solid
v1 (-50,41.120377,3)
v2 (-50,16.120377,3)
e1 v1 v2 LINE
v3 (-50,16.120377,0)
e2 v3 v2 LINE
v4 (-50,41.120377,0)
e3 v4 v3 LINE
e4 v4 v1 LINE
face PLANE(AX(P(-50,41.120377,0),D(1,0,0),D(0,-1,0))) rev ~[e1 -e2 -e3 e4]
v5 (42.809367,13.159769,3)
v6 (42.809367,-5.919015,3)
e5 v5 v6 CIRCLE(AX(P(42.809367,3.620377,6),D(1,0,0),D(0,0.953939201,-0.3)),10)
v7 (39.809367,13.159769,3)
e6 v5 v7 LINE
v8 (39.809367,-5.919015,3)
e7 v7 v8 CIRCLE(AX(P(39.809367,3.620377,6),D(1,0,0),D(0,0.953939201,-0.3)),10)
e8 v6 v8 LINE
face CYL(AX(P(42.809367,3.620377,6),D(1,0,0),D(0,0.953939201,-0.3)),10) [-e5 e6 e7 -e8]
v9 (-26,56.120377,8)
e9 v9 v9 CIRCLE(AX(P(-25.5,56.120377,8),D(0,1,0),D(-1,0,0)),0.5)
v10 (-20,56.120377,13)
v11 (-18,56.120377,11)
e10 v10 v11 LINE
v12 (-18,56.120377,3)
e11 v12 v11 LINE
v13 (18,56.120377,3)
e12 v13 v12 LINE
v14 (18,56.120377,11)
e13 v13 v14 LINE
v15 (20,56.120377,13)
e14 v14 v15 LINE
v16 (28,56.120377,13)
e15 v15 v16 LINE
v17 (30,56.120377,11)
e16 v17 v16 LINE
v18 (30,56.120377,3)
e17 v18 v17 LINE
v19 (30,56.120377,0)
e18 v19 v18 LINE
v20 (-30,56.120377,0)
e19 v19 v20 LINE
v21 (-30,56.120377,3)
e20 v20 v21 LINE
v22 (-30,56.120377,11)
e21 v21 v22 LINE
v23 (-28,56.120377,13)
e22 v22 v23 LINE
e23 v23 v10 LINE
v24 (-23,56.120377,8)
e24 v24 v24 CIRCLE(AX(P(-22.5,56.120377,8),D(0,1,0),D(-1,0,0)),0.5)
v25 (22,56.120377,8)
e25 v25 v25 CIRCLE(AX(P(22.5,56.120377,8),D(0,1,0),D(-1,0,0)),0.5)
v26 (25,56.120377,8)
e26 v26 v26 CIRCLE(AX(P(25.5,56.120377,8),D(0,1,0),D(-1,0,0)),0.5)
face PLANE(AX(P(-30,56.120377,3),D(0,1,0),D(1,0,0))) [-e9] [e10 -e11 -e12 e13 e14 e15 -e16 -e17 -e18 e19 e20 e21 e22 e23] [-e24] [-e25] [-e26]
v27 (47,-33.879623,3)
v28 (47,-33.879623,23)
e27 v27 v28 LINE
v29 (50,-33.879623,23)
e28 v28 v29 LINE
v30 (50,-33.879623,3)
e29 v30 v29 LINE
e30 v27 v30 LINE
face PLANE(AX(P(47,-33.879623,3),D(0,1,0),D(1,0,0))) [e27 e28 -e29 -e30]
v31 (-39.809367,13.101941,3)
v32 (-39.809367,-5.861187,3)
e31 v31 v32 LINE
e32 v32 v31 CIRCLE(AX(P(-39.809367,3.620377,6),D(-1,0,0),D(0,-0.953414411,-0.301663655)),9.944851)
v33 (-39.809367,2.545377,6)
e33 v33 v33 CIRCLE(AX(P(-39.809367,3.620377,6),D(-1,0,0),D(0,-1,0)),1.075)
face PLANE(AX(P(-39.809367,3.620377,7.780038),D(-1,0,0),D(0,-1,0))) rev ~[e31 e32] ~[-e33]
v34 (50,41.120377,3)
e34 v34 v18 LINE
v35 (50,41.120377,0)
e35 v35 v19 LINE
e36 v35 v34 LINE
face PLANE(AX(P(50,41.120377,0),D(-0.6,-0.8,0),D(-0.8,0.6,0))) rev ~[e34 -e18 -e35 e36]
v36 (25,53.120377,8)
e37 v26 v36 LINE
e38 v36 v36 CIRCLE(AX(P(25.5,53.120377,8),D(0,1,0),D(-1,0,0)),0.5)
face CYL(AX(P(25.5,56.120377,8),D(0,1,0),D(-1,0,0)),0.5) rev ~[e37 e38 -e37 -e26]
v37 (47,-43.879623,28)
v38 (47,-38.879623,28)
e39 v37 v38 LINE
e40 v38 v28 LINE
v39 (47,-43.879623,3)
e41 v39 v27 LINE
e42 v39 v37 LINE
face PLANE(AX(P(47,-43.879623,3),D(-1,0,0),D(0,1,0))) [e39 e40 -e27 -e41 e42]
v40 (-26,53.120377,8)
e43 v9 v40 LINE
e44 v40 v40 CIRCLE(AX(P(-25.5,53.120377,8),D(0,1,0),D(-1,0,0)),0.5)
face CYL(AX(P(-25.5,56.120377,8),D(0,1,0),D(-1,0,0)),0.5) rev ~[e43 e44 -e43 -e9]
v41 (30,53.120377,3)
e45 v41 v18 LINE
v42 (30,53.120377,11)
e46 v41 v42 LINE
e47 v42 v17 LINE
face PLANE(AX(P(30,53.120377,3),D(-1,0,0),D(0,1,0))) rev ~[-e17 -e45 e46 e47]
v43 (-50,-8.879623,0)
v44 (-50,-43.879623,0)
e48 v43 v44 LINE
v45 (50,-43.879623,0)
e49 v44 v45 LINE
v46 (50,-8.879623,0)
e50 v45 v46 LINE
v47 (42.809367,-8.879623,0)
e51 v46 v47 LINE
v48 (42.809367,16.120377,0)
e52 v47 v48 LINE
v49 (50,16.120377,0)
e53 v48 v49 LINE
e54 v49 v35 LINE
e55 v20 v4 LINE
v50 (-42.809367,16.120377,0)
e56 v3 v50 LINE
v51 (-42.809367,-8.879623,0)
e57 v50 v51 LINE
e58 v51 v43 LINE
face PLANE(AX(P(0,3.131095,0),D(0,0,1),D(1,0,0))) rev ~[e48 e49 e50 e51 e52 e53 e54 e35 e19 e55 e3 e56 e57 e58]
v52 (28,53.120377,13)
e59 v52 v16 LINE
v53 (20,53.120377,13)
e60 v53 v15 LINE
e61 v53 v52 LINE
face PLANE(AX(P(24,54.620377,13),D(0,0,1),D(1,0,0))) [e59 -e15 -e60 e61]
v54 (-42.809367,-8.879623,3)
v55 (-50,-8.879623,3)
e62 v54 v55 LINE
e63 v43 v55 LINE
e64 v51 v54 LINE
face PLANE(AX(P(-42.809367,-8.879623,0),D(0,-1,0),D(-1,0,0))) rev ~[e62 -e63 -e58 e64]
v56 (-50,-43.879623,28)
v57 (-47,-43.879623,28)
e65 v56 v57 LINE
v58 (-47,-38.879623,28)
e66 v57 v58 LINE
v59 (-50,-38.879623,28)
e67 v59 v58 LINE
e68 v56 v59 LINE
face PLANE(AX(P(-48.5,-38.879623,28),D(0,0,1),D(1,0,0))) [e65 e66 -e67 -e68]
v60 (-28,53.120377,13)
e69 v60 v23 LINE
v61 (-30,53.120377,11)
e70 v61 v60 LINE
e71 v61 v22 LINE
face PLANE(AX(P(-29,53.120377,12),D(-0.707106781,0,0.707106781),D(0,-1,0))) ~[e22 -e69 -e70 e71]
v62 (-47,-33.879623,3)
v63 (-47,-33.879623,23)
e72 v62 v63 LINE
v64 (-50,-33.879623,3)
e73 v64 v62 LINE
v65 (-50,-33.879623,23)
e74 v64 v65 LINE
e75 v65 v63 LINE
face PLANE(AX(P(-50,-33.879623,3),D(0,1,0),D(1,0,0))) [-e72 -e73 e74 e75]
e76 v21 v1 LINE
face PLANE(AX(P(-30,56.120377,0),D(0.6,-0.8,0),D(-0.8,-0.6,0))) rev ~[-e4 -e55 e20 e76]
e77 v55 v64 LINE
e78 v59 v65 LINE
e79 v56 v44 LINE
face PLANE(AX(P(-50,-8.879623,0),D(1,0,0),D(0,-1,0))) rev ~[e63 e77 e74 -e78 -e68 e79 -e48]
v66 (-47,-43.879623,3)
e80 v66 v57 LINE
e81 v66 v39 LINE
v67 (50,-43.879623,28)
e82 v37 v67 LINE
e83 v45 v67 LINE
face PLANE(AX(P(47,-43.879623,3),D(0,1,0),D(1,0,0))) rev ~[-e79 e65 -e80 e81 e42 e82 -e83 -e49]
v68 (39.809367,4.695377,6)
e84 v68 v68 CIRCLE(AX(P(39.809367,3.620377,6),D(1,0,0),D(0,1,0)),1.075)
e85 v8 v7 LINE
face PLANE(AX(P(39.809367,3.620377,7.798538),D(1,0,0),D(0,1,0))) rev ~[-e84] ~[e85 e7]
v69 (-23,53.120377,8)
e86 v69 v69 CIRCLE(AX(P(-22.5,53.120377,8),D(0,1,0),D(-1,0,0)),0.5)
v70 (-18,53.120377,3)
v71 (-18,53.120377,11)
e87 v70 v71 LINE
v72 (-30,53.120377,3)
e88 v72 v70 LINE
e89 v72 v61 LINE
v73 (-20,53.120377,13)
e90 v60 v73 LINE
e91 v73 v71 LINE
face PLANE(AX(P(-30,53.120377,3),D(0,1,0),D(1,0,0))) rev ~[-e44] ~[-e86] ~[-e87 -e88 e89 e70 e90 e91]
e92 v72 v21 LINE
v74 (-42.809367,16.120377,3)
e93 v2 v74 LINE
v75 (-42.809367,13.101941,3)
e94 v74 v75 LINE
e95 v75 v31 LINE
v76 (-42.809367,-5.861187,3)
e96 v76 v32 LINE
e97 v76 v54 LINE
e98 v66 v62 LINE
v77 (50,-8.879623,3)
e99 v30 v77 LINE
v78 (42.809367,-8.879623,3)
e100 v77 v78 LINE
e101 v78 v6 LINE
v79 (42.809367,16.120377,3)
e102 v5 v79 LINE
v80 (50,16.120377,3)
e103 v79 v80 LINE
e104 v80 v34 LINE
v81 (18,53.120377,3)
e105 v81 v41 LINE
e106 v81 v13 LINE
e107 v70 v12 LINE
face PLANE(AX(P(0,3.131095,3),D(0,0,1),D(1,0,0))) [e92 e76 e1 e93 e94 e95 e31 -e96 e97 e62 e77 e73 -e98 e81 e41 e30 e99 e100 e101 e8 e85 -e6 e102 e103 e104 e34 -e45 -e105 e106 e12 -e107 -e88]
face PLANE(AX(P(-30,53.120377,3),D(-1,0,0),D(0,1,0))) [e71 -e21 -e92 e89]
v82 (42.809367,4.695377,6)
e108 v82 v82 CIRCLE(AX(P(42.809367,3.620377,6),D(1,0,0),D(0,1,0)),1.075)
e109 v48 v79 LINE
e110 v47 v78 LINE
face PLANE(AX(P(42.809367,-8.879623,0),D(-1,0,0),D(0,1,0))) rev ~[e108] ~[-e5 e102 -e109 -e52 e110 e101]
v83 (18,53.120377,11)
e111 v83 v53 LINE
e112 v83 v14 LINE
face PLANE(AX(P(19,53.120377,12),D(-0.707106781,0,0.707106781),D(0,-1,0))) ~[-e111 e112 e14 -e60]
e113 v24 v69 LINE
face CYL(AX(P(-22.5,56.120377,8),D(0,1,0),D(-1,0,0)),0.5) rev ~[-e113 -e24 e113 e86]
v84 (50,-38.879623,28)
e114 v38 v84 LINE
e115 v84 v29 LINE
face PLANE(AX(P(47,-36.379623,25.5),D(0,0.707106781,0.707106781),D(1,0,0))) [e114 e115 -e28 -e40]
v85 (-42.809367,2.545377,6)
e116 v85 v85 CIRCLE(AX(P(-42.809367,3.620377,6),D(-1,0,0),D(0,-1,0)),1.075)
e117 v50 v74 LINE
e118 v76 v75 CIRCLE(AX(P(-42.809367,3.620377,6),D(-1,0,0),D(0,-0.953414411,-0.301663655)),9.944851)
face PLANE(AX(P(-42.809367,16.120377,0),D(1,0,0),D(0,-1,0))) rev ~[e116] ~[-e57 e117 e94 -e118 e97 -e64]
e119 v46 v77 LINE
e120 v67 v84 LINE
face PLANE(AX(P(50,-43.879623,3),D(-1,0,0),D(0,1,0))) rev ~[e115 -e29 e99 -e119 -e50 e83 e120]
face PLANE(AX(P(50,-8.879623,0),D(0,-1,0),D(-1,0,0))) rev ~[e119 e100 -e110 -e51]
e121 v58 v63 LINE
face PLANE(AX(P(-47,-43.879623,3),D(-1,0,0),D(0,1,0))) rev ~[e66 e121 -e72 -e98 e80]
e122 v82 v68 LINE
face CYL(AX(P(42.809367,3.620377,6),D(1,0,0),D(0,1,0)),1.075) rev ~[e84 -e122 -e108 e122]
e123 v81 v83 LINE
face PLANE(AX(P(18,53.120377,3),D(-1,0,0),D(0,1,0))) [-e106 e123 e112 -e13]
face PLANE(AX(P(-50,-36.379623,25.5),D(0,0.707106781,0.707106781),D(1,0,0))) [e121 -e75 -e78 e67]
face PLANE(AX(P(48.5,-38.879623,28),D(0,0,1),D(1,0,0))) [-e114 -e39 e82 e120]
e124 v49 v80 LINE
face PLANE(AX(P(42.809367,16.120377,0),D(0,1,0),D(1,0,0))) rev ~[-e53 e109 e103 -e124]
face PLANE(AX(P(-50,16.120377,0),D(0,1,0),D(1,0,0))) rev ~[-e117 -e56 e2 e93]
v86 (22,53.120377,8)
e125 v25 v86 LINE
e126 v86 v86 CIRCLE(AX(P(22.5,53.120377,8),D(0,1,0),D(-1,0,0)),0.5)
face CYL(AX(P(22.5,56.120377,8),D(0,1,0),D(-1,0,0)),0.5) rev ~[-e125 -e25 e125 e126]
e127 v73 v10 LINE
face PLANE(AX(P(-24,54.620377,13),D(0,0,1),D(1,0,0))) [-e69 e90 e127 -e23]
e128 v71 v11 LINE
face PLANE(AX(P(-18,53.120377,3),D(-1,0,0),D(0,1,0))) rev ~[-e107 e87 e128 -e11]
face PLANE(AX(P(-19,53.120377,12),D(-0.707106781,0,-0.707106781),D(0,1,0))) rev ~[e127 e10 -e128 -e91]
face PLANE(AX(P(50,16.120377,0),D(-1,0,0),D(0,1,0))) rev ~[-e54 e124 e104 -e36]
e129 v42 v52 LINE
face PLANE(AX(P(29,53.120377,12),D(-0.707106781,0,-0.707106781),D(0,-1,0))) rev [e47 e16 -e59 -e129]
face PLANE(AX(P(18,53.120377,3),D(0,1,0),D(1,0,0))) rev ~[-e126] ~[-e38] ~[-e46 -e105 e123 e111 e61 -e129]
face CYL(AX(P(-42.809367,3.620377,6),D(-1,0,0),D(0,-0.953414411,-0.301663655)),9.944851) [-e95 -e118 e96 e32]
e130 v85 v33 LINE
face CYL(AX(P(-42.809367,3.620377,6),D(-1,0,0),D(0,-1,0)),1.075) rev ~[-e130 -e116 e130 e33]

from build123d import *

# Parameters (mm, degrees)
F1_DEPTH  = 3
F2_R      = 1.075
F3_DEPTH  = 3
F4_R      = 1.075
F5_DEPTH  = 3
F6_W      = 12
F6_H      = 3
F7_DEPTH  = 10
F8_R      = 0.5
F9_DEPTH  = 3
F10_SIZE  = 2
F11_W     = 3
F11_H     = 10
F12_DEPTH = 25
F13_SIZE  = 5


# Not quite as in the source:
# - a feature names something its author has since deleted; it is built from what else it names


with BuildPart() as f1:
    # F0 (on Top) → F1 (new body)
    with BuildSketch(Plane.XY):
        Polygon((30, 56.1203770339), (-30, 56.1203770339), (-50, 41.1203770339), (-50, 16.1203770339), (-42.8093671799, 16.1203770339), (-42.8093671799, -8.8796229661), (-50, -8.8796229661), (-50, -43.8796229661), (50, -43.8796229661), (50, -8.8796229661), (42.8093671799, -8.8796229661), (42.8093671799, 16.1203770339), (50, 16.1203770339), (50, 41.1203770339), align=None)
    extrude(amount=F1_DEPTH)

    # F2 (on face) → F3 (join)
    with BuildSketch(Plane.YZ.offset(42.8093671799)):
        with BuildLine():
            Line((-5.9190149802, 3), (13.1597690481, 3))
            ThreePointArc((13.1597690481, 3), (3.6203770339, 16), (-5.9190149802, 3))
        make_face()
        with Locations((3.6203770339, 6)):
            Circle(F2_R, mode=Mode.SUBTRACT)
    extrude(amount=-F3_DEPTH)

    # F4 (on face) → F5 (join)
    with BuildSketch(Plane(origin=(-42.8093671799, 0, 0), x_dir=(0, -1, 0), z_dir=(-1, 0, 0))):
        with BuildLine():
            Line((-13.1019409746, 3), (5.8611869067, 3))
            ThreePointArc((5.8611869067, 3), (-3.6203770339, 15.9448506656), (-13.1019409746, 3))
        make_face()
        with Locations((-3.6203770339, 6)):
            Circle(F4_R, mode=Mode.SUBTRACT)
    extrude(amount=-F5_DEPTH)

    # F6 (on face) → F7 (join)
    with BuildSketch(Plane.XY.offset(3)):
        with Locations((-24, 54.6203770339)):
            Rectangle(F6_W, F6_H)
        with Locations((24, 54.6203770339)):
            Rectangle(F6_W, F6_H)
    extrude(amount=F7_DEPTH)

    # F8 (on face) → F9 (cut, through all)
    with BuildSketch(Plane(origin=(0, 56.1203770339, 0), x_dir=(-1, 0, 0), z_dir=(0, 1, 0))):
        with Locations((-25.5, 8)):
            Circle(F8_R)
        with Locations((-22.5, 8)):
            Circle(F8_R)
        with Locations((25.5, 8)):
            Circle(F8_R)
        with Locations((22.5, 8)):
            Circle(F8_R)
    extrude(amount=-F9_DEPTH, mode=Mode.SUBTRACT)

    # F10
    f10_edges = [f1.edges().sort_by_distance(p)[0] for p in [
        (18, 54.620377, 13),
        (30, 54.620377, 13),
        (-18, 54.620377, 13),
        (-30, 54.620377, 13),
    ]]
    chamfer(f10_edges, length=F10_SIZE)

    # F11 (on face) → F12 (join)
    with BuildSketch(Plane.XY.offset(3)):
        with Locations((48.5, -38.8796229661)):
            Rectangle(F11_W, F11_H)
        with Locations((-48.5, -38.8796229661)):
            Rectangle(F11_W, F11_H)
    extrude(amount=F12_DEPTH)

    # F13
    f13_edges = [f1.edges().sort_by_distance(p)[0] for p in [
        (-48.5, -33.879623, 28),
        (48.5, -33.879623, 28),
    ]]
    chamfer(f13_edges, length=F13_SIZE)


solid = f1.part
